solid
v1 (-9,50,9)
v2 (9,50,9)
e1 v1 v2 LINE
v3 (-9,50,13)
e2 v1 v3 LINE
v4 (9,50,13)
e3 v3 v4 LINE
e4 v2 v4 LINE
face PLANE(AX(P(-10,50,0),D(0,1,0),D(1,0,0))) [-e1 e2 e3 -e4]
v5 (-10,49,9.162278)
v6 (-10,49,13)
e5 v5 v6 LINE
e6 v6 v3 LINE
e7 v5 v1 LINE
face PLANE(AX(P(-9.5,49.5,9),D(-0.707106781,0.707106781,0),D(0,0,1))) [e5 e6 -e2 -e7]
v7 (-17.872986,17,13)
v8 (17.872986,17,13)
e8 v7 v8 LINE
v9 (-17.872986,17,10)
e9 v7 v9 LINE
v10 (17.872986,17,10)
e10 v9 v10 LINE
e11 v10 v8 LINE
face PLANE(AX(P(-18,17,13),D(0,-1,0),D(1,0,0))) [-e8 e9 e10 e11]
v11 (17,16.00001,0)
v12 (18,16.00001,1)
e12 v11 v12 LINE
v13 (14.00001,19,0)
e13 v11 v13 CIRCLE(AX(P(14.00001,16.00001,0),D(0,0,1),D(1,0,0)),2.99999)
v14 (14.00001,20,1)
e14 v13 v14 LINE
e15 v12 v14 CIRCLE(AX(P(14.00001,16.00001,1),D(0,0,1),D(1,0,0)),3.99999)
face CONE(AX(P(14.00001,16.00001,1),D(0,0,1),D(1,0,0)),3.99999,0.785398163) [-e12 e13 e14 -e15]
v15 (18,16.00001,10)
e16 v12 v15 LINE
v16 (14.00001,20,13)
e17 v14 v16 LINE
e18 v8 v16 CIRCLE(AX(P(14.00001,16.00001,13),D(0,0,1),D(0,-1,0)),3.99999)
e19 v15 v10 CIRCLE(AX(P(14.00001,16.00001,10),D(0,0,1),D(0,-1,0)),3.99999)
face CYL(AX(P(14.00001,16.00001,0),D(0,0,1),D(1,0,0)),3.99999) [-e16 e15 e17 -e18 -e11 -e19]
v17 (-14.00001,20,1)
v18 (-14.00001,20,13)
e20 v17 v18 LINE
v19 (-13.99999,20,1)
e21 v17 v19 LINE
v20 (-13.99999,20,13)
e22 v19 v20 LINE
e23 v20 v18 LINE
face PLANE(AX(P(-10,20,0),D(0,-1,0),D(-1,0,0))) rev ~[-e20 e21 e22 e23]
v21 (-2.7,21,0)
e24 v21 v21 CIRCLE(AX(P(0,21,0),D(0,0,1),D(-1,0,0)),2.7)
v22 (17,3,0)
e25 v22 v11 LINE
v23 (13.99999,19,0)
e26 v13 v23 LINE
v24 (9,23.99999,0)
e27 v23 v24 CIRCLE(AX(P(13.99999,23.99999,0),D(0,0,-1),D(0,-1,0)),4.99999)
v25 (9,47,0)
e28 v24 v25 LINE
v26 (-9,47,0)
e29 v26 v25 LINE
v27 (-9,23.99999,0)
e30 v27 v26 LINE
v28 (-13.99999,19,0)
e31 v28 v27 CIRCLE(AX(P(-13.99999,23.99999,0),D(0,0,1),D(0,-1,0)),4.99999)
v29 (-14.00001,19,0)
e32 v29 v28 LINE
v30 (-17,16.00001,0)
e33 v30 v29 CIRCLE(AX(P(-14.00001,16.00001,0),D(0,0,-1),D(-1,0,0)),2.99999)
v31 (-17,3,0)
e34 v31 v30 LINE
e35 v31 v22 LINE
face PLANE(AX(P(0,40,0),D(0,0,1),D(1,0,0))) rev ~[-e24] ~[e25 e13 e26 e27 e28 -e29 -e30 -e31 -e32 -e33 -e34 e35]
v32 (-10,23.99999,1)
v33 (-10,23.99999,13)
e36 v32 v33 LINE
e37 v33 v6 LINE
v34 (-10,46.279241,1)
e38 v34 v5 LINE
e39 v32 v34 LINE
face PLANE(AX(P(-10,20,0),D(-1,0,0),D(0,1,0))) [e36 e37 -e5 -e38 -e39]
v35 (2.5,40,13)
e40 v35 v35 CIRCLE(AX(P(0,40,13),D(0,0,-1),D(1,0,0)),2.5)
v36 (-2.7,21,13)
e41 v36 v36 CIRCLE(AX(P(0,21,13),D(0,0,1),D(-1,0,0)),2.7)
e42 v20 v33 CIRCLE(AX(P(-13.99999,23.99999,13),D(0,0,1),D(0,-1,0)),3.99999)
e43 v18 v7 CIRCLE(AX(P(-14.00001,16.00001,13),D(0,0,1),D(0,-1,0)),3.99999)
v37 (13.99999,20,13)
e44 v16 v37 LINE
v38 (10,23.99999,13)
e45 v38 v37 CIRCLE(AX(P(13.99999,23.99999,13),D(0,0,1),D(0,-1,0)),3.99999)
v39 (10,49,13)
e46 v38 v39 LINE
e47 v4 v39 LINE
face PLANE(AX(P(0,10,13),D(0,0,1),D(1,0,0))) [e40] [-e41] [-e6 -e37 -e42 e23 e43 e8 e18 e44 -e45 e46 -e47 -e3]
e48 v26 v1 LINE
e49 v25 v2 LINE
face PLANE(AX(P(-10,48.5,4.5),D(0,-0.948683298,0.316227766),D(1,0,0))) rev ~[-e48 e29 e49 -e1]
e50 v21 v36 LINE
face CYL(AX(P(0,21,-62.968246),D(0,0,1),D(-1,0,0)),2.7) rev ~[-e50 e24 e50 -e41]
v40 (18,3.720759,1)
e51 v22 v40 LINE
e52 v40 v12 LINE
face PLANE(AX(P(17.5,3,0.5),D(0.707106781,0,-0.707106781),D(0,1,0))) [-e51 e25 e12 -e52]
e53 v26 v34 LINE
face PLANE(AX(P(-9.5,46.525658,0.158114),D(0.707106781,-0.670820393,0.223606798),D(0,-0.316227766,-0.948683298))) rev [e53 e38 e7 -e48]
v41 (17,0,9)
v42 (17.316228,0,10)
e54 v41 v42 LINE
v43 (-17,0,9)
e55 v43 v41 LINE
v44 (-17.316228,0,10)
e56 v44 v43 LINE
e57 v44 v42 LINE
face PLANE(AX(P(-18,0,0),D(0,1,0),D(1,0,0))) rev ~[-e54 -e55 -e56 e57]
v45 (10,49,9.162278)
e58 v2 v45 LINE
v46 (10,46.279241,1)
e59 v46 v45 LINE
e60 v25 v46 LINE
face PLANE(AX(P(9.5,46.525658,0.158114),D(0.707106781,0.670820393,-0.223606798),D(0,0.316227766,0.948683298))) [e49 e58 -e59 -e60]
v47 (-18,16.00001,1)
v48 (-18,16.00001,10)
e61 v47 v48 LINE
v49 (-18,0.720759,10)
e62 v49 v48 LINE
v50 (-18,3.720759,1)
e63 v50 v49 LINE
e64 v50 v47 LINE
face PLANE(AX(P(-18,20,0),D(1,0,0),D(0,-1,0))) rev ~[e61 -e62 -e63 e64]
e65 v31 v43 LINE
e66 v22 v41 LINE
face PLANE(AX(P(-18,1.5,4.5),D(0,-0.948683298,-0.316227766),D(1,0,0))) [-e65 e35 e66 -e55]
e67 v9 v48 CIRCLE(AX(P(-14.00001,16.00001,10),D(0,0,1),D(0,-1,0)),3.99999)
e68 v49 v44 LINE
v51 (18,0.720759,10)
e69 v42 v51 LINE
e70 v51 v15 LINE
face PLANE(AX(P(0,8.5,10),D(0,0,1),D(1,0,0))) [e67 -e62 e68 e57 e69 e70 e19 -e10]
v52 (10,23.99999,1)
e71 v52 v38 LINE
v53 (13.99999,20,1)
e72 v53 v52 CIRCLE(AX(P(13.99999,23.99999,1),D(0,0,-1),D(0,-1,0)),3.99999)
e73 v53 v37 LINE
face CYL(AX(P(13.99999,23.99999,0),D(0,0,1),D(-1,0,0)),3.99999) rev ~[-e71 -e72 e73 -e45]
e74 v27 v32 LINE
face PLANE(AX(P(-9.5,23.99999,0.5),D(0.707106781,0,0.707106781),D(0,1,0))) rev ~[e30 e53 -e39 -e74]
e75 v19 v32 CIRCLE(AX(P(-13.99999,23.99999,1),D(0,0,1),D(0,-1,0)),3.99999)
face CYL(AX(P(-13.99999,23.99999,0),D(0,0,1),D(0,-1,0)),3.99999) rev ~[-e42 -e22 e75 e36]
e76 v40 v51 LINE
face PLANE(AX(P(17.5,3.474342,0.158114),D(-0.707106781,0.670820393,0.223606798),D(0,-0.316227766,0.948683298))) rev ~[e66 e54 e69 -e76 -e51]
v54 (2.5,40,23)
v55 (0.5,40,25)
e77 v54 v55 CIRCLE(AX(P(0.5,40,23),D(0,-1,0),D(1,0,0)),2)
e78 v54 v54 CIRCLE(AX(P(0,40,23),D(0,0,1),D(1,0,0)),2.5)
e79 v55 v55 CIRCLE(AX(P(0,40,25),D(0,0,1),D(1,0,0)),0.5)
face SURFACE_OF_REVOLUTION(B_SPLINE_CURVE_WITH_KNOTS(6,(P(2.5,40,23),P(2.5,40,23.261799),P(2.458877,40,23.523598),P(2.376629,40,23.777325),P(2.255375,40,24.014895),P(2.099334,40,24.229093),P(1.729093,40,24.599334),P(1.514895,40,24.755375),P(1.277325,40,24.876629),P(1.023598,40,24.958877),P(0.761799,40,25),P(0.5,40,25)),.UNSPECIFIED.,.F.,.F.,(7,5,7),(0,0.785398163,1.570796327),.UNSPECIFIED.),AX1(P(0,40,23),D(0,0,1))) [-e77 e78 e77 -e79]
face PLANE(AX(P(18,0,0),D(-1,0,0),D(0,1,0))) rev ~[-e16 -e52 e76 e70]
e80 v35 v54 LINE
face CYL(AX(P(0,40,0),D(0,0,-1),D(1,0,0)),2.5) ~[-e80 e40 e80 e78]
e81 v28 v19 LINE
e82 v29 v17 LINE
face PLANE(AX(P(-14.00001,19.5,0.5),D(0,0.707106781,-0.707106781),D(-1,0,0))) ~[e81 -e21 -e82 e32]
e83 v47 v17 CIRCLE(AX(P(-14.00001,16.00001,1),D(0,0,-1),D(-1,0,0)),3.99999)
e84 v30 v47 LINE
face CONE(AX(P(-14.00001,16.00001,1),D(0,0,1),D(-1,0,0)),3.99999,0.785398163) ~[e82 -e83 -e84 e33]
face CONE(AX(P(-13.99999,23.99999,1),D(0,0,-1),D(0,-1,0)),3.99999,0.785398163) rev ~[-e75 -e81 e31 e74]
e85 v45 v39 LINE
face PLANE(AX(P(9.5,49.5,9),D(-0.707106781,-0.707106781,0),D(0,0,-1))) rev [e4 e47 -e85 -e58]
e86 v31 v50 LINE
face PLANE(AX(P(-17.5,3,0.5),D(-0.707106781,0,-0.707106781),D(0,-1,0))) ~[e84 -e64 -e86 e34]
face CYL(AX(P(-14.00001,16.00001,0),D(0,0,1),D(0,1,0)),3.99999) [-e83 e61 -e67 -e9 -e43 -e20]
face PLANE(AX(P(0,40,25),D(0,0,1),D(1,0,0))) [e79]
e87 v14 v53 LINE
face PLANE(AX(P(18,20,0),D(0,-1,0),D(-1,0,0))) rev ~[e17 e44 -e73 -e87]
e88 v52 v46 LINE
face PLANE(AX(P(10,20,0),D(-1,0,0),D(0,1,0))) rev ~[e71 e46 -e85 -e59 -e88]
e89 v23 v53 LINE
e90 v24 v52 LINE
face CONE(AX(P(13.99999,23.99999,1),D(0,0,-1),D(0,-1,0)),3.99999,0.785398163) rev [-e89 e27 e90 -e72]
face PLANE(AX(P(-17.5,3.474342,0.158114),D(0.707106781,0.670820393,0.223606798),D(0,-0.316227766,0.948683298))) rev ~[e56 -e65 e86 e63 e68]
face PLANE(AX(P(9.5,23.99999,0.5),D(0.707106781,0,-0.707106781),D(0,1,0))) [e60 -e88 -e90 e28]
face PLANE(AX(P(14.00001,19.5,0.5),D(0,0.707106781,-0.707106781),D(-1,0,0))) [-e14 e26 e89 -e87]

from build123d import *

# Parameters (mm, degrees)
F0_W     = 20
F0_H     = 30
F0_R     = 2.5
F1_DEPTH = 13
F2_W     = 36
F2_H     = 17
F3_DEPTH = 3
F4_D     = 5.4
F5_DEPTH = 25
F6_R     = 2
F7_R     = 3.99999
F8_SIZE2 = 9
F8_SIZE  = 3
F9_SIZE  = 1


# Not quite as in the source:
# - a fillet or chamfer is up to 0.001 mm smaller than in the source, because OpenCascade refuses the exact size


with BuildPart() as f1:
    # F0 (on Top) → F1 (new body)
    with BuildSketch(Plane.XY):
        Polygon((-18, 20), (-18, 0), (18, 0), (18, 20), (10, 20), (-10, 20), align=None)
        with Locations((0, 35)):
            Rectangle(F0_W, F0_H)
        with Locations((0, 40)):
            Circle(F0_R, mode=Mode.SUBTRACT)
        with Locations((0, 40)):
            Circle(F0_R)
    extrude(amount=F1_DEPTH)

    # F2 (on face) → F3 (cut)
    with BuildSketch(Plane.XY.offset(13)):
        with Locations((0, 8.5)):
            Rectangle(F2_W, F2_H)
    extrude(amount=-F3_DEPTH, mode=Mode.SUBTRACT)

    # F4 (through all)
    with Locations(Plane(origin=(0, 0, 0), x_dir=(1, 0, 0), z_dir=(0, 0, -1))):
        with Locations((0, -21)):
            Hole(F4_D / 2)

    # F0 (on Top) → F5 (join)
    with BuildSketch(Plane.XY):
        with Locations((0, 40)):
            Circle(F0_R)
    extrude(amount=F5_DEPTH)

    # F6
    f6_edges = [f1.edges().sort_by_distance(p)[0] for p in [
        (-2.5, 40, 25),
    ]]
    fillet(f6_edges, radius=F6_R)

    # F7 (radius 4 in the source; OpenCascade refuses exactly that, so slightly less here)
    f7_edges = [f1.edges().sort_by_distance(p)[0] for p in [
        (-18, 20, 6.5),
        (18, 20, 6.5),
        (-10, 20, 6.5),
        (10, 20, 6.5),
    ]]
    fillet(f7_edges, radius=F7_R)

    # F8
    f8_edges = [f1.edges().sort_by_distance(p)[0] for p in [
        (0, 50, 0),
        (0, 0, 0),
    ]]
    f8_side = f1.faces().sort_by_distance((-17.383883, 8.000005, 0))[0]
    chamfer(f8_edges, length=F8_SIZE, length2=F8_SIZE2, reference=f8_side)

    # F9
    f9_edges = [f1.edges().sort_by_distance(p)[0] for p in [
        (16.82843, 18.82843, 0),
        (11.17157, 21.17157, 0),
        (-11.17157, 21.17157, 0),
        (-16.82843, 18.82843, 0),
        (18, 1.5, 4.5),
        (-18, 1.5, 4.5),
        (-10, 50, 11),
        (-10, 48.5, 4.5),
        (10, 50, 11),
        (10, 48.5, 4.5),
    ]]
    chamfer(f9_edges, length=F9_SIZE)


solid = f1.part
